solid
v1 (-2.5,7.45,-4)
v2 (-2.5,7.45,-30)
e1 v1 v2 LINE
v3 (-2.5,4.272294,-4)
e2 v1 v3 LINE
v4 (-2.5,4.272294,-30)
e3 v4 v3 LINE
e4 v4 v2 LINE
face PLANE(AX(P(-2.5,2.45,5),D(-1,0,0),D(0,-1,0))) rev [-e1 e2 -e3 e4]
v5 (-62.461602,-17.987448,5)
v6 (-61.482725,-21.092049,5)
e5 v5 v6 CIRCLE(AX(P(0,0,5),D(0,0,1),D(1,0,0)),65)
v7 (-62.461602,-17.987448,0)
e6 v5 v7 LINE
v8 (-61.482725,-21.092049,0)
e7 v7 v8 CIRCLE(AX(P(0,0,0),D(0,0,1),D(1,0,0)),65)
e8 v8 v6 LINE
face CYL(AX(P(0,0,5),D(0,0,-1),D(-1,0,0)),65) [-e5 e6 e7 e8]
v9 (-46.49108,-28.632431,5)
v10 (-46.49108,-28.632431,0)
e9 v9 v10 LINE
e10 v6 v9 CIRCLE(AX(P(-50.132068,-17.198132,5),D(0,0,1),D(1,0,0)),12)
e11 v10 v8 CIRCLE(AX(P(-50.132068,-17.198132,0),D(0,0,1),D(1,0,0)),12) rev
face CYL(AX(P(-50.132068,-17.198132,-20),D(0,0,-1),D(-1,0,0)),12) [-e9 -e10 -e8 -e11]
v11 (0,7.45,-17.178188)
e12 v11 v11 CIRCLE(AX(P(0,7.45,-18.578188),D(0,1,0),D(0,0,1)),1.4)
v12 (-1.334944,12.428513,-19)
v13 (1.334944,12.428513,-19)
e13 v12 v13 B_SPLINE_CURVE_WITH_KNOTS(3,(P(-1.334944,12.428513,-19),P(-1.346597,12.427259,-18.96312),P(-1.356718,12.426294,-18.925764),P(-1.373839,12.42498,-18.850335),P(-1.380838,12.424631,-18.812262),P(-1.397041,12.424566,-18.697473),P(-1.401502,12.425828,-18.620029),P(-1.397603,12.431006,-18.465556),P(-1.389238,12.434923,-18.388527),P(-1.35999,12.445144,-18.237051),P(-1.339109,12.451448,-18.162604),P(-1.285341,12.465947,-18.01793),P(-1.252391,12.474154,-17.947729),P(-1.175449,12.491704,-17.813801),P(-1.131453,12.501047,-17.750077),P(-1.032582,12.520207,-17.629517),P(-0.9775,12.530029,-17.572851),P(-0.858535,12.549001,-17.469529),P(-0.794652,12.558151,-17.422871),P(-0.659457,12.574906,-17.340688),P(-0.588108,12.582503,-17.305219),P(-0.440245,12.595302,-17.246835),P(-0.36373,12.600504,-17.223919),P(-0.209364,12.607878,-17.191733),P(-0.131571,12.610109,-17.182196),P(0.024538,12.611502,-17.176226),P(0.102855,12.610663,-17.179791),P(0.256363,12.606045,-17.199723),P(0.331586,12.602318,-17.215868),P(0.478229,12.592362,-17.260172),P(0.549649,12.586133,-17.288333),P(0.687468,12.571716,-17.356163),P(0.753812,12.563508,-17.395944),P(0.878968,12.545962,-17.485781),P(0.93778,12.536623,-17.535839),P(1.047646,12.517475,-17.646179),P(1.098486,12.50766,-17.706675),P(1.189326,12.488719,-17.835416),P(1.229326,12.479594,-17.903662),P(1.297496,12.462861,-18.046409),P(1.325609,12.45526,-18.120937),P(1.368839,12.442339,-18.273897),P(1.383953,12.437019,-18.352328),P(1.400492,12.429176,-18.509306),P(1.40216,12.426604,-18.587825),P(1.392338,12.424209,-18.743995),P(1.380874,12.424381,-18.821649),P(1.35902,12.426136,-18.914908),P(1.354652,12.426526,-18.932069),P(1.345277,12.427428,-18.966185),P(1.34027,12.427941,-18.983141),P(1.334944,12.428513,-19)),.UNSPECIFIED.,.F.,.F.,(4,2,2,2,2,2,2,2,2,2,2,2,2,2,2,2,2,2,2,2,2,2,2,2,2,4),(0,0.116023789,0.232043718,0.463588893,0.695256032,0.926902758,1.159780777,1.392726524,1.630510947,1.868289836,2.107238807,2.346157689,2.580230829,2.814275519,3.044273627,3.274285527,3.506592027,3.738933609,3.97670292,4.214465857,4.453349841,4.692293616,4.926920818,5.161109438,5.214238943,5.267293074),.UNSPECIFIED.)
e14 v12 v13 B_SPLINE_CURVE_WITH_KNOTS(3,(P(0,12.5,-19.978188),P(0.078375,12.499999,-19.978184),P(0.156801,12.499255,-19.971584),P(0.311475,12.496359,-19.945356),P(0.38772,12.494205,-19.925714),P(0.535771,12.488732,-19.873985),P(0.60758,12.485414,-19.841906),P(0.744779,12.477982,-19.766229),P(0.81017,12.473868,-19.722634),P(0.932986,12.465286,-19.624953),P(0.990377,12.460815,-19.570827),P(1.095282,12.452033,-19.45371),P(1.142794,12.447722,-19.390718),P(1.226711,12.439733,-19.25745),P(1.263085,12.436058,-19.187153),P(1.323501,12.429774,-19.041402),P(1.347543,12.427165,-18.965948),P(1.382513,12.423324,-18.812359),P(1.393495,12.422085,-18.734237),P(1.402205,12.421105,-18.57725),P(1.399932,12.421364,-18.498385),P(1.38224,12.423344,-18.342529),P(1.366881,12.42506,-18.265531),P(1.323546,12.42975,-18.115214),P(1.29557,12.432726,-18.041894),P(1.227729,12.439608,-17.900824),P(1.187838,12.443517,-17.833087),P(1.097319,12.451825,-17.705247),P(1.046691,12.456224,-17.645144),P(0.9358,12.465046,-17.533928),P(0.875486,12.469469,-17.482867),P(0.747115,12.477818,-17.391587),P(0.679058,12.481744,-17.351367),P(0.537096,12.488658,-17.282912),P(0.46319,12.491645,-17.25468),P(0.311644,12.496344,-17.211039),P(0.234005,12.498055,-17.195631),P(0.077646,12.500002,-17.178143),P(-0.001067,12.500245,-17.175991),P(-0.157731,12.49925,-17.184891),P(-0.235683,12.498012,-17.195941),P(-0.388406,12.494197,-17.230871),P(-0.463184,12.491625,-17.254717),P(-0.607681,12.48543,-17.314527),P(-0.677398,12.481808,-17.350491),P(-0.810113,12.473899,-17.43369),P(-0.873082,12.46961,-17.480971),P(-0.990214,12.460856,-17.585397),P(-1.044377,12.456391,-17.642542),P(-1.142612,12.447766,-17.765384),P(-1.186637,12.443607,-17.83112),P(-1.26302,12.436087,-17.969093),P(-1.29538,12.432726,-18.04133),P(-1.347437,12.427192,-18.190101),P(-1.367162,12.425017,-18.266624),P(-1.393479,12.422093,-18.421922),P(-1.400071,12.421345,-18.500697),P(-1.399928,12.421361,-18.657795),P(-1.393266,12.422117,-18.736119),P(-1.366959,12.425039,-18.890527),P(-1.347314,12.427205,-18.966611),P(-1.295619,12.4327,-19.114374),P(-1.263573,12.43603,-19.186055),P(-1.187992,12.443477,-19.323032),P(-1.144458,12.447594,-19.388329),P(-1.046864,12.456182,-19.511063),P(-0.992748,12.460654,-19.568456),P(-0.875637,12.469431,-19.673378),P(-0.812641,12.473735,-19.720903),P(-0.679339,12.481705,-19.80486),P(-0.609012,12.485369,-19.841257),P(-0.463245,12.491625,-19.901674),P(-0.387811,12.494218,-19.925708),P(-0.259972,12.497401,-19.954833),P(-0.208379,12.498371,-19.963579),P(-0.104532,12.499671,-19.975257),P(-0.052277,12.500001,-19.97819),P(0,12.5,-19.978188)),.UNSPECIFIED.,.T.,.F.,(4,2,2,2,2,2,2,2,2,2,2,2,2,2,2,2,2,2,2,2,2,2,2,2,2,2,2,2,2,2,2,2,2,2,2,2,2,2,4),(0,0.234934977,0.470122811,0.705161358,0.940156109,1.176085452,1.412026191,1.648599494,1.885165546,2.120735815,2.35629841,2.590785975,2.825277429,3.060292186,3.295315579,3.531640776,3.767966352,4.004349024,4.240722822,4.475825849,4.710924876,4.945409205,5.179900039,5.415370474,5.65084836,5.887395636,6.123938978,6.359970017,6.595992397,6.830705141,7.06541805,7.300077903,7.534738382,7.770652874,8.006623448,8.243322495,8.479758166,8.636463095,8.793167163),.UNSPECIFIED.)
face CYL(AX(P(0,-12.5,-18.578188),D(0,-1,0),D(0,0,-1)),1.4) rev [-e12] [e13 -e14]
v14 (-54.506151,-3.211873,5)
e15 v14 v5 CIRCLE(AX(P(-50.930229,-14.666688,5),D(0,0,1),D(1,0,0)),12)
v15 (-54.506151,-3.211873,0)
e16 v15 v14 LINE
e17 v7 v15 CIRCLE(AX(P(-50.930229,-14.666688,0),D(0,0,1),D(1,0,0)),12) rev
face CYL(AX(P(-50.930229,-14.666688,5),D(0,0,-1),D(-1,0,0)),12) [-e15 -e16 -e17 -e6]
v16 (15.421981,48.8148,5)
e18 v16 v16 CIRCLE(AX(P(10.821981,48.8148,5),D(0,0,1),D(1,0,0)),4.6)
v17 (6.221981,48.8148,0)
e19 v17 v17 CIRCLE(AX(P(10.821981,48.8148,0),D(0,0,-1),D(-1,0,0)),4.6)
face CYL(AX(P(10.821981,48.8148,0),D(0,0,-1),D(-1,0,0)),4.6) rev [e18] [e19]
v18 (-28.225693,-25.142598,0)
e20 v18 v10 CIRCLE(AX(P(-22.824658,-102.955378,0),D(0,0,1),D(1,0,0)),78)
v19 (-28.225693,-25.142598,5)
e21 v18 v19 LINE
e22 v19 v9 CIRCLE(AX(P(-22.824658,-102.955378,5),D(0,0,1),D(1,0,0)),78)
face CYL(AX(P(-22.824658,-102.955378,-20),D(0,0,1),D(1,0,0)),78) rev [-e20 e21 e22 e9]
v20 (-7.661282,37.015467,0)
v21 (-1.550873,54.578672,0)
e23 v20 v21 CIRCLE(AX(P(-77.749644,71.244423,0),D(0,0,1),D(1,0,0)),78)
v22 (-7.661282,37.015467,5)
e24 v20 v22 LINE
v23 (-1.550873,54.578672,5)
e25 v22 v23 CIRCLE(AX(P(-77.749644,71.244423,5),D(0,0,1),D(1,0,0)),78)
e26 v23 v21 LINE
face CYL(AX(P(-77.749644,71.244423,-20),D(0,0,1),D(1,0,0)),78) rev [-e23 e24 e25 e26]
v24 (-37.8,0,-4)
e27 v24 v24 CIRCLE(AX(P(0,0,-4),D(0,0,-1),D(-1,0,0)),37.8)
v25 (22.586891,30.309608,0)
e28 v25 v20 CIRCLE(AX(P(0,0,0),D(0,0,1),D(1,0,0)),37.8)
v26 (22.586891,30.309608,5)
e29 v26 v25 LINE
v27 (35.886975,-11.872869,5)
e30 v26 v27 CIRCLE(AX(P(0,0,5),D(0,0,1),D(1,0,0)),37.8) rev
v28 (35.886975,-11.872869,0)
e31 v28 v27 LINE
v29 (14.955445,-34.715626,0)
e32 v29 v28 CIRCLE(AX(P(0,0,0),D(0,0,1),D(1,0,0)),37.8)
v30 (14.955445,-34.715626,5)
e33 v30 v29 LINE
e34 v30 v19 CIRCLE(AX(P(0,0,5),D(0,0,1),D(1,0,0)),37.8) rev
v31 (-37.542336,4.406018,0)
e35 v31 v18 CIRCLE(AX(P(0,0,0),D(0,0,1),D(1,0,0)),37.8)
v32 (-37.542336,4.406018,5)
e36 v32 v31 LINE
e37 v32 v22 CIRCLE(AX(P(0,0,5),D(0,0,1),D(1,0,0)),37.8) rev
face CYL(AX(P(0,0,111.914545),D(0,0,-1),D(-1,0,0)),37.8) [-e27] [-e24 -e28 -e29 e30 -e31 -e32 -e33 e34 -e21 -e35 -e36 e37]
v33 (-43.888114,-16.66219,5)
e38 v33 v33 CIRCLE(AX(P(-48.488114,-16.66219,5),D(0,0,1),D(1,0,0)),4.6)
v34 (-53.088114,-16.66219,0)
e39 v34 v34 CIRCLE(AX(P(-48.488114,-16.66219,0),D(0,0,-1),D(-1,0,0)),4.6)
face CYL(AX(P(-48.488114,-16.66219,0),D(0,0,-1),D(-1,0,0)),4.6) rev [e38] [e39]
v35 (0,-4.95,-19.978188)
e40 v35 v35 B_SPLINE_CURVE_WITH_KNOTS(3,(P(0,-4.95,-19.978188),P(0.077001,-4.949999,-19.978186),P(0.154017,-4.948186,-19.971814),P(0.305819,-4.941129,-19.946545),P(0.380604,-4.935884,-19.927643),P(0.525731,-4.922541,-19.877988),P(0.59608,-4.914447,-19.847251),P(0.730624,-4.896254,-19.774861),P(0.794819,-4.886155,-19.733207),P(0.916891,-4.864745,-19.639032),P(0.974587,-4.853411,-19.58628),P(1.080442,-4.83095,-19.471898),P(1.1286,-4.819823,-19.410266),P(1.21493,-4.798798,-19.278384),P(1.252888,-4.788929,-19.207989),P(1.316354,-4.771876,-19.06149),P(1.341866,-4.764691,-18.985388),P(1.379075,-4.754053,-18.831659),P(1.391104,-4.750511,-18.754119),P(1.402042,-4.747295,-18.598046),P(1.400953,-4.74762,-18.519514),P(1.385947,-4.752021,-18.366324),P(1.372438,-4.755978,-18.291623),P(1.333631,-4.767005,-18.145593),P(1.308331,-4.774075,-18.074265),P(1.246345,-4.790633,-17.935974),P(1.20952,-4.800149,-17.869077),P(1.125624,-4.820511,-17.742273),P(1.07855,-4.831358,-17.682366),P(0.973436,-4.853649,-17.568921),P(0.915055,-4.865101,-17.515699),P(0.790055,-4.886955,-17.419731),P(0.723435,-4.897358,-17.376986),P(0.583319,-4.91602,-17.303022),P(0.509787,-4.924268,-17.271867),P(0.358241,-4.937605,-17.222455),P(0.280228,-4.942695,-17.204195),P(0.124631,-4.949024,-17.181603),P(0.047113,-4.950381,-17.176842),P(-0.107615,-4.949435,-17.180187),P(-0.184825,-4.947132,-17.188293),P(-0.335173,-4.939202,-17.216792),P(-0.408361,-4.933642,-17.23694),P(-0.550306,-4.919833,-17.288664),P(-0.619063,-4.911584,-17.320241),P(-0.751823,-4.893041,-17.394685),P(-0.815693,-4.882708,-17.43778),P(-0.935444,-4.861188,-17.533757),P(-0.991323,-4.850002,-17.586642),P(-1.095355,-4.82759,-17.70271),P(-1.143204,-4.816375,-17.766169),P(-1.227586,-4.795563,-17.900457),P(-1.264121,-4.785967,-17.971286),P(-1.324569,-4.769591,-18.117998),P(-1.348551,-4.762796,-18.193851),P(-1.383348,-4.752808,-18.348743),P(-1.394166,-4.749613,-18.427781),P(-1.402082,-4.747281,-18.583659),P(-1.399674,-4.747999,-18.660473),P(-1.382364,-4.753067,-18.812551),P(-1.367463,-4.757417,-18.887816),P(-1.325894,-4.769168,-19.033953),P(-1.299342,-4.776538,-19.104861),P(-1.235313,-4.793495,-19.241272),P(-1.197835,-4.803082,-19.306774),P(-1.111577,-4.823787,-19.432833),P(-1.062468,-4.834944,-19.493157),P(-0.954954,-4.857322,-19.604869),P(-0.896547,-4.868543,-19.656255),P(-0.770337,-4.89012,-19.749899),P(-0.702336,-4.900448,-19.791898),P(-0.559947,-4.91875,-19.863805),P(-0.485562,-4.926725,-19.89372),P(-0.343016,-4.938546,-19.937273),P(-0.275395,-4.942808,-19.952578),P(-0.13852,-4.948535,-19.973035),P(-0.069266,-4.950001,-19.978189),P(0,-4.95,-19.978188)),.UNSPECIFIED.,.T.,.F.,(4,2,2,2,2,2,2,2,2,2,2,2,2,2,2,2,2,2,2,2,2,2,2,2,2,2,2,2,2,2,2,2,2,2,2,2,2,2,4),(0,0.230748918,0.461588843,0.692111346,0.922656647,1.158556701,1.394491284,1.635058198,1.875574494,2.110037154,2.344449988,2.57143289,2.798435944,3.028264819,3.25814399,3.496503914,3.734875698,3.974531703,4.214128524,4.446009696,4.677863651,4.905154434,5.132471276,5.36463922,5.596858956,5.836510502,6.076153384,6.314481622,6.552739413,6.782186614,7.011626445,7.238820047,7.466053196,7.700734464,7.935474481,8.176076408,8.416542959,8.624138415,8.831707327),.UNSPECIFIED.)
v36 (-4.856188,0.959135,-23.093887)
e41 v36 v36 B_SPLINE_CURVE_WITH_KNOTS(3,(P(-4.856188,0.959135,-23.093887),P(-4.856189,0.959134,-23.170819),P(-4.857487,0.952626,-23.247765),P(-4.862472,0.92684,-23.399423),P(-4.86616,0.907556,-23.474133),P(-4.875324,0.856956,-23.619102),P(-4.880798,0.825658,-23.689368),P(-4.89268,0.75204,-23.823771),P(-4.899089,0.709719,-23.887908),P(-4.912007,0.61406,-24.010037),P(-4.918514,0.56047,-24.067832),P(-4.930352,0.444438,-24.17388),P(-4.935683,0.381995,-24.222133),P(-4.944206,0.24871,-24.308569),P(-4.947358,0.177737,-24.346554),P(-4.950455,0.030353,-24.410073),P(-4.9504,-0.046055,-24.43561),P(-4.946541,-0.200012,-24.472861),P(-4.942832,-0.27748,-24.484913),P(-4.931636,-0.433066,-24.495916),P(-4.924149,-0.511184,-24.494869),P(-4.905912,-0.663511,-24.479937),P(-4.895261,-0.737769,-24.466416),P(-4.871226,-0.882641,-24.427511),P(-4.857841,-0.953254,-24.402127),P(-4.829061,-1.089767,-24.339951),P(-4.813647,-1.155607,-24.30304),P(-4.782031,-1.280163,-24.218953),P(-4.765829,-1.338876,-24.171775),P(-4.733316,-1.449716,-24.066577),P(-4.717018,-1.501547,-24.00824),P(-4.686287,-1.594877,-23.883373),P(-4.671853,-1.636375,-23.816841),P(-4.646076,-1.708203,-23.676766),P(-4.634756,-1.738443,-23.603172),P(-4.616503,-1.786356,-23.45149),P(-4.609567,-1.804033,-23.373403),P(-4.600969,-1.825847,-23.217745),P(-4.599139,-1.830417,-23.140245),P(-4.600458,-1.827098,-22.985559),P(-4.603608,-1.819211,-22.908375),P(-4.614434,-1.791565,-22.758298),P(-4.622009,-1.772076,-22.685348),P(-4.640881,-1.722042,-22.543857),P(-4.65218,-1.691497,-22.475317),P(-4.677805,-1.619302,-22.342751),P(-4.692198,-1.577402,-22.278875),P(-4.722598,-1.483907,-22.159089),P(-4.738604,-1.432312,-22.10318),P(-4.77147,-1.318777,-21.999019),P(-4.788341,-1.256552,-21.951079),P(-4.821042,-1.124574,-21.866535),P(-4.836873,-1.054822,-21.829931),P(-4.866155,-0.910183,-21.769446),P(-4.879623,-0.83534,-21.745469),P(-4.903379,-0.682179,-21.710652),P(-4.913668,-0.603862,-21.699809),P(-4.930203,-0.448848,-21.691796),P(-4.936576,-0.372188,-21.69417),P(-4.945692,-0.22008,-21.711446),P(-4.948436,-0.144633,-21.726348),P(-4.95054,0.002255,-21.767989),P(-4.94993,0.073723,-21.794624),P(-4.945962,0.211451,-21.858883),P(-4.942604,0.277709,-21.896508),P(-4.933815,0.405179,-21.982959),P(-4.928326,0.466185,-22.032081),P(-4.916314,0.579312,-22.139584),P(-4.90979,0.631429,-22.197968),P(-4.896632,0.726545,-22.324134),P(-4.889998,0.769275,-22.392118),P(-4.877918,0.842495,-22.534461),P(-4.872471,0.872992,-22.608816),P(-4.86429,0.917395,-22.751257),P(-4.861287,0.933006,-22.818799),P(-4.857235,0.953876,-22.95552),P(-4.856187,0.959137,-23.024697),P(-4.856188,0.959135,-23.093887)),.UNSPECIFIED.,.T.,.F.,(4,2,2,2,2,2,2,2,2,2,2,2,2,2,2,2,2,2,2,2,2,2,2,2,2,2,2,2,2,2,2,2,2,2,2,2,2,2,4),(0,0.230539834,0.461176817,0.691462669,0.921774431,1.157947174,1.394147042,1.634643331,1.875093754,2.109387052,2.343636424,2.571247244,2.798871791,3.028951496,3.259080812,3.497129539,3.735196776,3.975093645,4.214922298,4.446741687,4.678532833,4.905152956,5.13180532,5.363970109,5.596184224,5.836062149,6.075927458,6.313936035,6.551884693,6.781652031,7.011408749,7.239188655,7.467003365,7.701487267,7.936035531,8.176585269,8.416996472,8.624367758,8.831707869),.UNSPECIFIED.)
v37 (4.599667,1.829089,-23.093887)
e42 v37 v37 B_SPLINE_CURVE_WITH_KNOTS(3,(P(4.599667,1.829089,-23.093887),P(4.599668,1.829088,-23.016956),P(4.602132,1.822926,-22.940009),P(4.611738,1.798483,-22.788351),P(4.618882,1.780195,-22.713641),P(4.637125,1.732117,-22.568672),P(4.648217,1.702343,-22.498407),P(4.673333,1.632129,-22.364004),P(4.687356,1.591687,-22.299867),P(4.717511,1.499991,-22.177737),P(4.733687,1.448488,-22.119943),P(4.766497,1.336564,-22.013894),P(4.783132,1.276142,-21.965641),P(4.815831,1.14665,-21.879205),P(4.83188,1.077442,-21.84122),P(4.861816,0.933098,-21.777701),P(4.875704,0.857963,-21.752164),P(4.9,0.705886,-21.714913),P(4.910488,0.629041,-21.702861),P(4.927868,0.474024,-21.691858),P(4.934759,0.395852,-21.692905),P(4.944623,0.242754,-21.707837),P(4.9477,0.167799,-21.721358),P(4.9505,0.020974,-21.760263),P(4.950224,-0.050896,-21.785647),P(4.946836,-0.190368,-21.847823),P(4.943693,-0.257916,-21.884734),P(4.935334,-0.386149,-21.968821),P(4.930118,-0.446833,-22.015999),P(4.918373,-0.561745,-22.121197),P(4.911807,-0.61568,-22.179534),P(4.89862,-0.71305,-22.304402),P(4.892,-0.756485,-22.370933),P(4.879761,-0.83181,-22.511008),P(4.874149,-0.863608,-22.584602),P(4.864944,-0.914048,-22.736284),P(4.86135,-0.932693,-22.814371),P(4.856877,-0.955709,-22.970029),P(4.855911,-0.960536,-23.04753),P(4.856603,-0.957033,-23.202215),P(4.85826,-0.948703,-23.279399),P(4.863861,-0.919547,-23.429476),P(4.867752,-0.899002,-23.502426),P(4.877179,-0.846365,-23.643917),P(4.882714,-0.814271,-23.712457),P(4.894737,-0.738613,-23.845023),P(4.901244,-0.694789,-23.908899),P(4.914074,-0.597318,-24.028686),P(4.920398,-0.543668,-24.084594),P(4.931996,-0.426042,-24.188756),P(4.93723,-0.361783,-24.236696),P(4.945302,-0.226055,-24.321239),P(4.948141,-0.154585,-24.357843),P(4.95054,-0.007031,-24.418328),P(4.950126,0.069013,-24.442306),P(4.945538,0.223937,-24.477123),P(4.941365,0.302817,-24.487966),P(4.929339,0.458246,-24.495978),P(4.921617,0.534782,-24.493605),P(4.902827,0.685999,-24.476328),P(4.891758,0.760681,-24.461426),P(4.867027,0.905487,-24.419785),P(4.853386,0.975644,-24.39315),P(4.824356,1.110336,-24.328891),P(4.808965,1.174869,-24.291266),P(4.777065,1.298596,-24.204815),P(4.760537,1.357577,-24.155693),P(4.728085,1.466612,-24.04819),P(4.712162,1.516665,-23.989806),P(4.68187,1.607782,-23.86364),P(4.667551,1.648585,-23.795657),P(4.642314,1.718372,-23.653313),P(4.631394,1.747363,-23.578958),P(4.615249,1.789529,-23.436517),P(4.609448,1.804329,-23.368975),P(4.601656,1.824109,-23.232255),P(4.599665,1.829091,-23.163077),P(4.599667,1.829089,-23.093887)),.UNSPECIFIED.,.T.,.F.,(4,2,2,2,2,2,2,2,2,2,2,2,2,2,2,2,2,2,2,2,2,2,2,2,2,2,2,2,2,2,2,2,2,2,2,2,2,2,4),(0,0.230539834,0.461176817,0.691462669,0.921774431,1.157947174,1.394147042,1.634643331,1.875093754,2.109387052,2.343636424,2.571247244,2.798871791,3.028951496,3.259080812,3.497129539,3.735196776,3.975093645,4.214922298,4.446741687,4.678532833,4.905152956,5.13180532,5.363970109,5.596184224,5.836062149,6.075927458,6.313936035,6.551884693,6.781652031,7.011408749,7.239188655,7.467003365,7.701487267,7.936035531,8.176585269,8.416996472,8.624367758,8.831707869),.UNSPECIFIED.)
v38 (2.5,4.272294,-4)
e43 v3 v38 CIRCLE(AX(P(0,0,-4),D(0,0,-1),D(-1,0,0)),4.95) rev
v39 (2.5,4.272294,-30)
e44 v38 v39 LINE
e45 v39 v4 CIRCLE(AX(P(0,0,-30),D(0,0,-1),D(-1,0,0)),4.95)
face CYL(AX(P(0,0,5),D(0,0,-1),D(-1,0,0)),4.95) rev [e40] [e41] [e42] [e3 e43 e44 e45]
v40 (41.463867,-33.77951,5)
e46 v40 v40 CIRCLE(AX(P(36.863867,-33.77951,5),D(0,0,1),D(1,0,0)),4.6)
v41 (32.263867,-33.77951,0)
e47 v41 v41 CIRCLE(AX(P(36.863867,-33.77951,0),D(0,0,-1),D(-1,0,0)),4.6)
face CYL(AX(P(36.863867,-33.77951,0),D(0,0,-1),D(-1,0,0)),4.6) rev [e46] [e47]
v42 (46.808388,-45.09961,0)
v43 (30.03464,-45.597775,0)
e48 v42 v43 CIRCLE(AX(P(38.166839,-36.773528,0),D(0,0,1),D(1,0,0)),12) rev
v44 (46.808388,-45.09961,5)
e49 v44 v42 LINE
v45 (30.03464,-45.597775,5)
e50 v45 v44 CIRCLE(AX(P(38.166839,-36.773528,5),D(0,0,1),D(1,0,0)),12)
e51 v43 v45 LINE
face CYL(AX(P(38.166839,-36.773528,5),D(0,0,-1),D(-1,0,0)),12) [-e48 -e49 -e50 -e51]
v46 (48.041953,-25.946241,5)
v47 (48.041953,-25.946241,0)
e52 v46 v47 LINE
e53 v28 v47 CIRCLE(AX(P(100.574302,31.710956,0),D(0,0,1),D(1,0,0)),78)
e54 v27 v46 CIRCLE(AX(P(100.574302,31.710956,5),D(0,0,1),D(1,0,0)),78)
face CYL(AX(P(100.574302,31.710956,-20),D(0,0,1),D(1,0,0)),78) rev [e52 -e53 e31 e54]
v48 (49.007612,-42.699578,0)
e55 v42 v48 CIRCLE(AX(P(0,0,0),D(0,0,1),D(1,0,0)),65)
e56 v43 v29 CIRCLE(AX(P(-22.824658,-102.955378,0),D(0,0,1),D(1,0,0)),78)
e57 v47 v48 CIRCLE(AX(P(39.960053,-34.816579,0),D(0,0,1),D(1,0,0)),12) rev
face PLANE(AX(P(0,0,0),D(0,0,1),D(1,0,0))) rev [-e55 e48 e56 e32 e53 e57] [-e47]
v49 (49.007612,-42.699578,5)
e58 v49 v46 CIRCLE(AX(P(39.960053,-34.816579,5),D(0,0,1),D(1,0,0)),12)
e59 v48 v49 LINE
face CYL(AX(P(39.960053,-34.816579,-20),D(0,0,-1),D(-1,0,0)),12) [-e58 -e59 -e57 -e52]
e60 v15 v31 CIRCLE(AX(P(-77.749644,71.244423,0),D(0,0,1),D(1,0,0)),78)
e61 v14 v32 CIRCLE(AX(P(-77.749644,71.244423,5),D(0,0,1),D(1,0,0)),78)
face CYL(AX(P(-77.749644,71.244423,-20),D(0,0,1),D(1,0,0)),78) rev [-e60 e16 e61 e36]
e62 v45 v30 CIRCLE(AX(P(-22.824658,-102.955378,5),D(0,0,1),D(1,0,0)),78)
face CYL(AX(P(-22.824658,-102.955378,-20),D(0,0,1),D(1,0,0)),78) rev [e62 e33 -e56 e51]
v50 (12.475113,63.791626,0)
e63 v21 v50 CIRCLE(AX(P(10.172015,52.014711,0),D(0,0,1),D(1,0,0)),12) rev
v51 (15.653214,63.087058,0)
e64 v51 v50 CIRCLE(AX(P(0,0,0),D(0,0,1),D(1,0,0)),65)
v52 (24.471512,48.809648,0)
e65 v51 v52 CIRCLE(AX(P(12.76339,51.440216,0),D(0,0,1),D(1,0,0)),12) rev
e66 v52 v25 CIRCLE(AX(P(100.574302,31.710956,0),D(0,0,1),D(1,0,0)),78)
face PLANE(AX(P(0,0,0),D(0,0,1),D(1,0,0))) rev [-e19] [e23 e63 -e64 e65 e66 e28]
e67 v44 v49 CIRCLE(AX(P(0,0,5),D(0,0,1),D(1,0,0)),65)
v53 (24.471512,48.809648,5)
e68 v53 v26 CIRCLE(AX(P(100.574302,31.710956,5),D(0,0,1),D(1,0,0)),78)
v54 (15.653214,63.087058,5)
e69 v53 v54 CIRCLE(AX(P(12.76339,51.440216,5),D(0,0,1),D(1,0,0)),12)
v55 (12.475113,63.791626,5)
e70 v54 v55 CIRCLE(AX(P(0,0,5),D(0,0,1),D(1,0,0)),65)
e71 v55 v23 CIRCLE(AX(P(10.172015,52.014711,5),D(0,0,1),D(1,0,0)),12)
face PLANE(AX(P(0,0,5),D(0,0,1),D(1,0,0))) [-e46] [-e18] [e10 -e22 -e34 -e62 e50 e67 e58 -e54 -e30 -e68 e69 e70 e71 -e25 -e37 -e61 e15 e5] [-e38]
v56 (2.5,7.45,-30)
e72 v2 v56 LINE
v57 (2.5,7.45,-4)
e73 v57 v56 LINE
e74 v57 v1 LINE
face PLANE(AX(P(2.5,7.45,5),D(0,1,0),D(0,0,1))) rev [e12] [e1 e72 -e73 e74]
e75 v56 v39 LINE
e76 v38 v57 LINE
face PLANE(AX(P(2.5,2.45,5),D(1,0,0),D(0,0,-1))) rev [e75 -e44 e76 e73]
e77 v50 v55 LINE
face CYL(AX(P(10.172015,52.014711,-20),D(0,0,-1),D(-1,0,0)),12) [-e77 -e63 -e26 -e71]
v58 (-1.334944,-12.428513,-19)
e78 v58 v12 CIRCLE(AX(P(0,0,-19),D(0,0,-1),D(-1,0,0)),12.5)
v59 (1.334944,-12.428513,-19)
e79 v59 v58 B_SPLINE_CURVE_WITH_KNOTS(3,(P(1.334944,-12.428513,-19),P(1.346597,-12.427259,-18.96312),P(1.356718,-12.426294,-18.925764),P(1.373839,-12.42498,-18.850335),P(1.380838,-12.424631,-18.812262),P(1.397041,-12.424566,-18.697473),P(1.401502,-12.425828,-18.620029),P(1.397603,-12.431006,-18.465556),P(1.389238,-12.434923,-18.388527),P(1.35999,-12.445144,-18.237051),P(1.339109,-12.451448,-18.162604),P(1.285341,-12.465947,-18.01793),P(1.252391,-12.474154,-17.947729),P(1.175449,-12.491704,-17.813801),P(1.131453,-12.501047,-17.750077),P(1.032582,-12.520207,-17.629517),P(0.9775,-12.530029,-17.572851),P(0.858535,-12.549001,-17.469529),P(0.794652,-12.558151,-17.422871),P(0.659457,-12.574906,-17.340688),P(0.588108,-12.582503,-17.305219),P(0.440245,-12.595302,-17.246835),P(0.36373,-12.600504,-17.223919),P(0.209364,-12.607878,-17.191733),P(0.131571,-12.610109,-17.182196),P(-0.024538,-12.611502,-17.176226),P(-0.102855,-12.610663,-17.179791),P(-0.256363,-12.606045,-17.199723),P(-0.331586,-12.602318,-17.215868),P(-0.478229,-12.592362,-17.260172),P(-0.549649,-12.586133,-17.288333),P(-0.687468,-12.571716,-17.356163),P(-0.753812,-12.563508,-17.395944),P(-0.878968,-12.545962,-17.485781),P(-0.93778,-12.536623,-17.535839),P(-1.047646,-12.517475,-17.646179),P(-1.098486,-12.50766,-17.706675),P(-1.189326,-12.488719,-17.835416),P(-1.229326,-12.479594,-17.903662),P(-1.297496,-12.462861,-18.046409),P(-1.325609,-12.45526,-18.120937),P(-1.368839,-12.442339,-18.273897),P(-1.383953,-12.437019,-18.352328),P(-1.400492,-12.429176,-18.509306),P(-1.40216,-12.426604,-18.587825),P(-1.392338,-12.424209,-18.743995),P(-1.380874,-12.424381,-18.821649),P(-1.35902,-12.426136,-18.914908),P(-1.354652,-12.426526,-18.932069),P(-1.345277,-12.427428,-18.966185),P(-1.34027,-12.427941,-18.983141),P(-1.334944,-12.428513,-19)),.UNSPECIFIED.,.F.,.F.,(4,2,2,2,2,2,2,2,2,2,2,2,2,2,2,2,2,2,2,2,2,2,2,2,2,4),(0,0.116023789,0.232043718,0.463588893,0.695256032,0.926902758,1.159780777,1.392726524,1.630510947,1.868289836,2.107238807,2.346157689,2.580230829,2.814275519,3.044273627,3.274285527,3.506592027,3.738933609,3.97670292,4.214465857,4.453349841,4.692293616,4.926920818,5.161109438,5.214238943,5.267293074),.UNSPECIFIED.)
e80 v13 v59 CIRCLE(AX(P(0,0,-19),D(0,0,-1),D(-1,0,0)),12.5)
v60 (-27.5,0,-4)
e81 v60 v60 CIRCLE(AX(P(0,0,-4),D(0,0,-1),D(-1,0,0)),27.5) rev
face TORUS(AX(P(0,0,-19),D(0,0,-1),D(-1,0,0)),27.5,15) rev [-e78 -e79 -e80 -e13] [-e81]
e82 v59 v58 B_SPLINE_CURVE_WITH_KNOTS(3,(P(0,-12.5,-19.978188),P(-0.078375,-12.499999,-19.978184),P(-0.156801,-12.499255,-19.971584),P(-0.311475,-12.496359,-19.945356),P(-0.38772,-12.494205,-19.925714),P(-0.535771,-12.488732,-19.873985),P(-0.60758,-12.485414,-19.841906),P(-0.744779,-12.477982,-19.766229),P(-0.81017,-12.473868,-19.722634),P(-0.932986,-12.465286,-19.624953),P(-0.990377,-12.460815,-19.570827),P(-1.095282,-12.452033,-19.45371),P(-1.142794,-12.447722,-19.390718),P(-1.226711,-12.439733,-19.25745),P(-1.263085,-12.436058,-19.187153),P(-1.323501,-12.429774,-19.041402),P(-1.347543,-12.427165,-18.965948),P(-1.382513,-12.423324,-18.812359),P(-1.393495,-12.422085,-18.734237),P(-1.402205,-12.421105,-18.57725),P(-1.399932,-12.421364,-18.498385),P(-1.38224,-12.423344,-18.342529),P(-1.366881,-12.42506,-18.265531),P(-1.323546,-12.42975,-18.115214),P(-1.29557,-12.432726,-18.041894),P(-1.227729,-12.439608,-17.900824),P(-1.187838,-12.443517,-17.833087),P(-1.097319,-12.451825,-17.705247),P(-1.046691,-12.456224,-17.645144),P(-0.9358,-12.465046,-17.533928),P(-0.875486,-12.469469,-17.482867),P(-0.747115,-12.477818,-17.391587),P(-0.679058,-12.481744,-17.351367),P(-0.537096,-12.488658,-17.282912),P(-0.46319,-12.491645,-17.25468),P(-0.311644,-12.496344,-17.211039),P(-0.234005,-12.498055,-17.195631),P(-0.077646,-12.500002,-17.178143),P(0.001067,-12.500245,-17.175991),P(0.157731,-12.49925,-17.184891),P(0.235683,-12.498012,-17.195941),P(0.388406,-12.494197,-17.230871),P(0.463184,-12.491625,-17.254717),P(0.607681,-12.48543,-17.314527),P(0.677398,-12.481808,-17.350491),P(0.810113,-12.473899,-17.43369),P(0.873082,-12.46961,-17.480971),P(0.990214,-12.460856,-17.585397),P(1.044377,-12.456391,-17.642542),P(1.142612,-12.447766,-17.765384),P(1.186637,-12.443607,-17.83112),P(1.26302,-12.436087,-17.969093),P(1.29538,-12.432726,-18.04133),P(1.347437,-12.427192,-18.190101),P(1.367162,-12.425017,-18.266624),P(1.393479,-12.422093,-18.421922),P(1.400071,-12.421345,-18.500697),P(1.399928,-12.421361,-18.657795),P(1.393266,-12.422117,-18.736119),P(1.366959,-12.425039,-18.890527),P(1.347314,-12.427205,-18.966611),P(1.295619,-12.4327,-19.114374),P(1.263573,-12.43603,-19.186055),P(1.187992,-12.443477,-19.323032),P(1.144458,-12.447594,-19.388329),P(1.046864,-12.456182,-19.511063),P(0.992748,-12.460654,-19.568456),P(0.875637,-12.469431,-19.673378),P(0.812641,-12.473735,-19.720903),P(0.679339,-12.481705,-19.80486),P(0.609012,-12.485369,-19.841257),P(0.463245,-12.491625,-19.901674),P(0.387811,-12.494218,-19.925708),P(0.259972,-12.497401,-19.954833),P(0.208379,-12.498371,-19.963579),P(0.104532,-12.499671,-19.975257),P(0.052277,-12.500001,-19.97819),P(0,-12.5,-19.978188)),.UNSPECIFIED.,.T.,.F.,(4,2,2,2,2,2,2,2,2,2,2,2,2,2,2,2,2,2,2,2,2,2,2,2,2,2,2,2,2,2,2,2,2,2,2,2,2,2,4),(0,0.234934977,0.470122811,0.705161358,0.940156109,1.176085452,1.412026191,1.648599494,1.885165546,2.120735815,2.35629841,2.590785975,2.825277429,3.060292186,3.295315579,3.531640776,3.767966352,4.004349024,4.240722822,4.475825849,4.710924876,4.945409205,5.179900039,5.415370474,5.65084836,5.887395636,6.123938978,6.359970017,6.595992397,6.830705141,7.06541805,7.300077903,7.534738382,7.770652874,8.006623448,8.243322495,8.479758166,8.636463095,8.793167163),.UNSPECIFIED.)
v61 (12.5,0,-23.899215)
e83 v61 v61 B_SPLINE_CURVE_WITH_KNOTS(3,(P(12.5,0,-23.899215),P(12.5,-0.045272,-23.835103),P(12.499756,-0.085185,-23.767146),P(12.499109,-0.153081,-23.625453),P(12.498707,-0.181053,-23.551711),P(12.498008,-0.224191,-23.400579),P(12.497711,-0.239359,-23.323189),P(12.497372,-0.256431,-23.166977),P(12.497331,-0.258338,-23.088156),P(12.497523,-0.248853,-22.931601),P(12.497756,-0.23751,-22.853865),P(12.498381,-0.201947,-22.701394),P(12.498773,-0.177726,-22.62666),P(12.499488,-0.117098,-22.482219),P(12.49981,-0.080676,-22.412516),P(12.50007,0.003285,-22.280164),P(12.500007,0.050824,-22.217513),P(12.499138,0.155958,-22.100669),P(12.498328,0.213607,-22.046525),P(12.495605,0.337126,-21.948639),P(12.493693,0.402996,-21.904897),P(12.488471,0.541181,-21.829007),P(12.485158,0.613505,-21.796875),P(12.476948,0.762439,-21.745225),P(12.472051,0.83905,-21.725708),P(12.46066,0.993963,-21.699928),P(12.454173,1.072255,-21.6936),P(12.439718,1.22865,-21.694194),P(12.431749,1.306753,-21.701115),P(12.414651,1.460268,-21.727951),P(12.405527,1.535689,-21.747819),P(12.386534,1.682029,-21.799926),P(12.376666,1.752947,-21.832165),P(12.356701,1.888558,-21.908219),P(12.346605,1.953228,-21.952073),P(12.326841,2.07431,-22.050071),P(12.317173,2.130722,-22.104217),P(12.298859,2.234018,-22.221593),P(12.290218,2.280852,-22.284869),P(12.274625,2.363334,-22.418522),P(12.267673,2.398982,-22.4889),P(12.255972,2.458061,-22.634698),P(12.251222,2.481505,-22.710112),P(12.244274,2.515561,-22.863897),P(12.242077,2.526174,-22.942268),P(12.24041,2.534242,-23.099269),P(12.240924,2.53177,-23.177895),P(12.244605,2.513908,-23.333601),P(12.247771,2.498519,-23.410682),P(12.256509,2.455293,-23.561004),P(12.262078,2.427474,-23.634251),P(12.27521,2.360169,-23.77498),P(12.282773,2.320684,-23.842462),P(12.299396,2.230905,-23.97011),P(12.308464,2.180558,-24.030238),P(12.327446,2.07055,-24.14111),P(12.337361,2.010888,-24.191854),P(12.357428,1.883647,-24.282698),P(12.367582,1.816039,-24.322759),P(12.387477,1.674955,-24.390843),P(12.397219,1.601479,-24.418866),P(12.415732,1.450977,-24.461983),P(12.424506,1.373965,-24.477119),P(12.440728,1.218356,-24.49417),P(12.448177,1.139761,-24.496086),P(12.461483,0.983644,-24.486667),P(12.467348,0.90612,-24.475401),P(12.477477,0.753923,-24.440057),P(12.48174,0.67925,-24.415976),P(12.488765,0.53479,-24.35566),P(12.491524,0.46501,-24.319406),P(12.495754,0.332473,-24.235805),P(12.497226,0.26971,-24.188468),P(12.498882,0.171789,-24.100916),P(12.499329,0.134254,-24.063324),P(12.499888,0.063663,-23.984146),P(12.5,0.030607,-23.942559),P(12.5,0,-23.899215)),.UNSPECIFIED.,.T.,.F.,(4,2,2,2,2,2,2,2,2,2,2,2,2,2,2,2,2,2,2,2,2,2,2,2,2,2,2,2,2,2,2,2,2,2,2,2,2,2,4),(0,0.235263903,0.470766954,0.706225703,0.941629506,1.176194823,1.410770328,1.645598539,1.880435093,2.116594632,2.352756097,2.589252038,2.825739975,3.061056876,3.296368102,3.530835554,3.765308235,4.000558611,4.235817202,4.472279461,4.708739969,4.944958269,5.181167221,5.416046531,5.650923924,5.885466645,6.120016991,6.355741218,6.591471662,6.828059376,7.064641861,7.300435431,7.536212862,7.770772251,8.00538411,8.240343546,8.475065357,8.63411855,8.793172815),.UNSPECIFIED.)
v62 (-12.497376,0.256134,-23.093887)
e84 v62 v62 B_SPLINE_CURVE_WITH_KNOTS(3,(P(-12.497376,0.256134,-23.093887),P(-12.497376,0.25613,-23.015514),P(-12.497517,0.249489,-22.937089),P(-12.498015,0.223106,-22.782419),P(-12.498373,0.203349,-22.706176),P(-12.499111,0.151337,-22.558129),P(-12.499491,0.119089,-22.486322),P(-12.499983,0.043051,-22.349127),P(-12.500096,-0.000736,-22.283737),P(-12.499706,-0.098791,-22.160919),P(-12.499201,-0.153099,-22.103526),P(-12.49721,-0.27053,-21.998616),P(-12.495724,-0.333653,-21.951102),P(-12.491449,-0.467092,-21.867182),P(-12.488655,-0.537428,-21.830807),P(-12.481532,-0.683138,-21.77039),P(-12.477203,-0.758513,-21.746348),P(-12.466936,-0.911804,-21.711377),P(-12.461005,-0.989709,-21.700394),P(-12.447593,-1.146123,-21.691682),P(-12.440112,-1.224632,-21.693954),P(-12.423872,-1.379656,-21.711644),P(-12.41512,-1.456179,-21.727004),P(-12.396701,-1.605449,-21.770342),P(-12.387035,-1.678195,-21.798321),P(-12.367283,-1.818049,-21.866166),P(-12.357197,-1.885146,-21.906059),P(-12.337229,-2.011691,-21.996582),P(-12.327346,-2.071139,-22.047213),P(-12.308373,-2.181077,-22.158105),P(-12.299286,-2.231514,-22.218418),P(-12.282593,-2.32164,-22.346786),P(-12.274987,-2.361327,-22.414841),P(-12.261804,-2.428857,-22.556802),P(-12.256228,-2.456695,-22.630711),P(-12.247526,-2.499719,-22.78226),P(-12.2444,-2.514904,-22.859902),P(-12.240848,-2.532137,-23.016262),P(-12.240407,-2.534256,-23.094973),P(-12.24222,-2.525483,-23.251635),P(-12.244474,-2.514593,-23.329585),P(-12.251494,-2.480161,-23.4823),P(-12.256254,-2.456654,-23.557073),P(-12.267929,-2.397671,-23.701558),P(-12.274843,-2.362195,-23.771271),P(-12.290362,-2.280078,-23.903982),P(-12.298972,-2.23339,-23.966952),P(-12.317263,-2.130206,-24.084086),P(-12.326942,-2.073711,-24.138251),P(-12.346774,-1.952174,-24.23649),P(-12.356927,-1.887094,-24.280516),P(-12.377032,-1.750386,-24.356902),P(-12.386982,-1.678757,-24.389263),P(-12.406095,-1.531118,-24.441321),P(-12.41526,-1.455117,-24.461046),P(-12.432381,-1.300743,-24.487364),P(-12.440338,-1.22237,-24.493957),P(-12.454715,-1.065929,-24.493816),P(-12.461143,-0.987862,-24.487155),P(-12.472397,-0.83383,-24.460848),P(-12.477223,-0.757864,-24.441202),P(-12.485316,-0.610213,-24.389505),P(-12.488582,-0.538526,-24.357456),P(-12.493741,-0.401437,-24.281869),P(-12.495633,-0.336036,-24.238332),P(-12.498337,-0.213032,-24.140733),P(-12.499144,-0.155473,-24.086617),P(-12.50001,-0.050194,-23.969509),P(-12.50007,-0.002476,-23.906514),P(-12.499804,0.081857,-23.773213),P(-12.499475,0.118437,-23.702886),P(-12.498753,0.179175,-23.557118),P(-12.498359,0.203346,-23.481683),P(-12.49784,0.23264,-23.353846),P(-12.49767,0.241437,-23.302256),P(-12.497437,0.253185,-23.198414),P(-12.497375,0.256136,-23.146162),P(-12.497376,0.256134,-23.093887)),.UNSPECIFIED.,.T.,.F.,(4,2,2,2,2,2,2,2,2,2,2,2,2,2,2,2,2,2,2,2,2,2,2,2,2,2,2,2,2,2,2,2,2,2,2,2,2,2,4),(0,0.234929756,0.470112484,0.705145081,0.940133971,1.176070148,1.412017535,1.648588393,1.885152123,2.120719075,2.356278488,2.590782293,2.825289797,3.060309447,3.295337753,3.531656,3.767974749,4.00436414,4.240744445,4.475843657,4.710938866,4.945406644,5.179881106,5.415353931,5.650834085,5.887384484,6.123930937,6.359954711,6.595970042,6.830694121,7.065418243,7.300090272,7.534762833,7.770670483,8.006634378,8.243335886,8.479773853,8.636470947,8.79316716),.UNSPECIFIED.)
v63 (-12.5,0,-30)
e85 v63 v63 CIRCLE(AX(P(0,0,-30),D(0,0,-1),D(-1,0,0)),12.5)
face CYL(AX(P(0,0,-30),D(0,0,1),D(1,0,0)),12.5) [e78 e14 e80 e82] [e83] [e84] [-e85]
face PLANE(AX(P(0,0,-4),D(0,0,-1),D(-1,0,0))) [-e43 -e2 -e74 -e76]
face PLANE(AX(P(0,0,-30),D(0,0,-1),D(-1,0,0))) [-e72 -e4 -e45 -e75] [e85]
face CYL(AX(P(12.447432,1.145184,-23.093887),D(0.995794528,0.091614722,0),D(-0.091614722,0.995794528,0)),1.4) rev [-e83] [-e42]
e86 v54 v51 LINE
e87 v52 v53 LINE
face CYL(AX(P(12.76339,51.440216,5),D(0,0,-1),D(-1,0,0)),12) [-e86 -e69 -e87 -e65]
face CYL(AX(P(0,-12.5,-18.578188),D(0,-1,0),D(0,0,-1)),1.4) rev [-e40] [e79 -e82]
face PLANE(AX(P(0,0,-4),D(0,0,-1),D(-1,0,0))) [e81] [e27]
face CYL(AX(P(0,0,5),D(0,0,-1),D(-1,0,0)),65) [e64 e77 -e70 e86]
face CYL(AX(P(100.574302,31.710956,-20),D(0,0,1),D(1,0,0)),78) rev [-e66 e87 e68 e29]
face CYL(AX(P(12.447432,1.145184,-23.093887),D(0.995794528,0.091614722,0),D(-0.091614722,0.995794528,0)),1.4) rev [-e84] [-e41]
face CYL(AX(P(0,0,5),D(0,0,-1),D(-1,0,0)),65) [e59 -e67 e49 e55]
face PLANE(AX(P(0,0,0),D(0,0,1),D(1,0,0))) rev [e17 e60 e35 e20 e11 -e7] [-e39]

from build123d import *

# Parameters (mm, degrees)
SKETCH1_R                           = 65
BOSS_EXTRUDE1_DEPTH                 = 5
CUT_EXTRUDE2_START                  = -25
CUT_EXTRUDE2_DEPTH                  = 25
FILLET2_R                           = 12
SKETCH9_R                           = 12.5
BOSS_EXTRUDE4_DEPTH                 = 30
SKETCH10_R                          = 4.95
CUT_EXTRUDE3_DEPTH                  = 97.34882957
SKETCH11_W                          = 5
SKETCH11_H                          = 5
CUT_EXTRUDE4_DEPTH                  = 97.34882957
F_1_0MM_DOWEL_HOLE3_D               = 2.8
F_1_0MM_DOWEL_HOLE3_DEPTH           = 33.158795133
F_1_0MM_DOWEL_HOLE3_TIP             = 0.841204867
F_1_0MM_DOWEL_HOLE3_ON_FACE_2_D     = 2.8
F_1_0MM_DOWEL_HOLE3_ON_FACE_2_DEPTH = 33.158795133
F_1_0MM_DOWEL_HOLE3_ON_FACE_2_TIP   = 0.841204867
BOSS_EXTRUDE5_DEPTH                 = 4
BOSS_EXTRUDE5_DEPTH_BACK            = 5
SKETCH13_R                          = 37.8
F_1_0MM_DOWEL_HOLE4_D               = 9.2
F_1_0MM_DOWEL_HOLE4_DEPTH           = 31.236041152
F_1_0MM_DOWEL_HOLE4_TIP             = 2.763958848
FILLET4_R                           = 15


with BuildPart() as part:
    # Sketch1 → Boss-Extrude1 (new body)
    with BuildSketch(Plane.XY):
        Circle(SKETCH1_R)
    extrude(amount=BOSS_EXTRUDE1_DEPTH)

    # Sketch6 → Cut-Extrude2 (cut)
    with BuildSketch(Plane.XY.offset(5).offset(CUT_EXTRUDE2_START)):
        with BuildLine():
            ThreePointArc((0, 65), (-47.923026893, 43.913363495), (-64.752655376, -5.665123279))
            ThreePointArc((-64.752655376, -5.665123279), (-20.242011997, 18.548386617), (0, 65))
        make_face()
        with BuildLine():
            ThreePointArc((37.282468363, -53.244882879), (-5.942368011, -26.804289921), (-56.291651246, -32.5))
            ThreePointArc((-56.291651246, -32.5), (-14.068574906, -63.459240463), (37.282468363, -53.244882879))
        make_face()
        with BuildLine():
            ThreePointArc((56.291651246, -32.5), (61.991601799, 19.545876968), (27.470187013, 58.910006157))
            ThreePointArc((27.470187013, 58.910006157), (26.184380008, 8.255903304), (56.291651246, -32.5))
        make_face()
    extrude(amount=CUT_EXTRUDE2_DEPTH, mode=Mode.SUBTRACT)

    # Fillet2
    fillet2_edges = [part.edges().sort_by_distance(p)[0] for p in [
        (27.470187013, 58.910006157, 2.5),
        (56.291651246, -32.5, 2.5),
        (-64.752655376, -5.665123279, 2.5),
        (0, 65, 2.5),
        (37.282468363, -53.244882879, 2.5),
        (-56.291651246, -32.5, 2.5),
    ]]
    fillet(fillet2_edges, radius=FILLET2_R)

    # Sketch9 → Boss-Extrude4 (add)
    with BuildSketch(Plane(origin=(0, 0, 0), x_dir=(-1, 0, 0), z_dir=(0, 0, -1))):
        with Locations(Location((0, 0, 0), (0, 0, 180))):
            Circle(SKETCH9_R)
    extrude(amount=BOSS_EXTRUDE4_DEPTH)

    # Sketch10 → Cut-Extrude3 (cut, through all)
    with BuildSketch(Plane(origin=(0, 0, -30), x_dir=(-1, 0, 0), z_dir=(0, 0, -1))):
        Circle(SKETCH10_R)
    extrude(amount=-CUT_EXTRUDE3_DEPTH, mode=Mode.SUBTRACT)

    # Sketch11 → Cut-Extrude4 (cut, through all)
    with BuildSketch(Plane(origin=(0, 0, -30), x_dir=(-1, 0, 0), z_dir=(0, 0, -1))):
        with Locations((0, 4.95)):
            Rectangle(SKETCH11_W, SKETCH11_H)
    extrude(amount=-CUT_EXTRUDE4_DEPTH, mode=Mode.SUBTRACT)

    # Ø1.0mm Dowel Hole3
    with Locations(Plane(origin=(0, -12.5, -18.578187756), x_dir=(-1, 0, 0), z_dir=(0, -1, 0))):
        with Locations((0, 0)):
            Hole(F_1_0MM_DOWEL_HOLE3_D / 2, depth=F_1_0MM_DOWEL_HOLE3_DEPTH)
            with Locations((0, 0, -(F_1_0MM_DOWEL_HOLE3_DEPTH + F_1_0MM_DOWEL_HOLE3_TIP / 2))):  # 118° drill point
                Cone(0, F_1_0MM_DOWEL_HOLE3_D / 2, F_1_0MM_DOWEL_HOLE3_TIP, mode=Mode.SUBTRACT)

    # Ø1.0mm Dowel Hole3 on face 2
    with Locations(Plane(origin=(12.447431605, 1.14518402, -23.093887112), x_dir=(-0.091614954639, 0.995794506957, 0), z_dir=(0.995794506957, 0.091614954639, 0))):
        with Locations((0, 0)):
            Hole(F_1_0MM_DOWEL_HOLE3_ON_FACE_2_D / 2, depth=F_1_0MM_DOWEL_HOLE3_ON_FACE_2_DEPTH)
            with Locations((0, 0, -(F_1_0MM_DOWEL_HOLE3_ON_FACE_2_DEPTH + F_1_0MM_DOWEL_HOLE3_ON_FACE_2_TIP / 2))):  # 118° drill point
                Cone(0, F_1_0MM_DOWEL_HOLE3_ON_FACE_2_D / 2, F_1_0MM_DOWEL_HOLE3_ON_FACE_2_TIP, mode=Mode.SUBTRACT)

    # Sketch13 → Boss-Extrude5 (add, two sides: drawn at the far end of the back side and taken through both)
    with BuildSketch(Plane(origin=(0, 0, 0), x_dir=(-1, 0, 0), z_dir=(0, 0, -1)).offset(-BOSS_EXTRUDE5_DEPTH_BACK)):
        Circle(SKETCH13_R)
    extrude(amount=BOSS_EXTRUDE5_DEPTH + BOSS_EXTRUDE5_DEPTH_BACK)

    # Ø1.0mm Dowel Hole4
    with Locations(Plane(origin=(10.821980697, 48.814800356, 0), x_dir=(-1, 0, 0), z_dir=(0, 0, -1))):
        with Locations((0, 0), (59.310094228, -65.476990486), (-26.041886144, -82.594310737)):
            Hole(F_1_0MM_DOWEL_HOLE4_D / 2, depth=F_1_0MM_DOWEL_HOLE4_DEPTH)
            with Locations((0, 0, -(F_1_0MM_DOWEL_HOLE4_DEPTH + F_1_0MM_DOWEL_HOLE4_TIP / 2))):  # 118° drill point
                Cone(0, F_1_0MM_DOWEL_HOLE4_D / 2, F_1_0MM_DOWEL_HOLE4_TIP, mode=Mode.SUBTRACT)

    # Fillet4
    # the kernel refuses this fillet: 15 mm, written as the material it adds along each edge
    with BuildSketch(Plane(origin=(0, 0, -4), x_dir=(1, 0, 0), z_dir=(0, -1, 0))) as fillet4_piece_1_section:
        with BuildLine():
            CenterArc((12.5 + FILLET4_R, -FILLET4_R), FILLET4_R, 90, 90)
            Line((12.5, -FILLET4_R), (12.5, 0))
            Line((12.5, 0), (12.5 + FILLET4_R, 0))
        make_face()
    fillet4_piece_1 = revolve(axis=Axis((0, 0, -4), (0, 0, 1)), mode=Mode.PRIVATE)
    fillet4_piece_1 = fillet4_piece_1 - Plane(origin=(0, 0, -18.578187756), x_dir=(1, 0, 0), z_dir=(0, 1, 0)) * Cylinder(1.4, 110, mode=Mode.PRIVATE)
    add(fillet4_piece_1)


solid = part.part
